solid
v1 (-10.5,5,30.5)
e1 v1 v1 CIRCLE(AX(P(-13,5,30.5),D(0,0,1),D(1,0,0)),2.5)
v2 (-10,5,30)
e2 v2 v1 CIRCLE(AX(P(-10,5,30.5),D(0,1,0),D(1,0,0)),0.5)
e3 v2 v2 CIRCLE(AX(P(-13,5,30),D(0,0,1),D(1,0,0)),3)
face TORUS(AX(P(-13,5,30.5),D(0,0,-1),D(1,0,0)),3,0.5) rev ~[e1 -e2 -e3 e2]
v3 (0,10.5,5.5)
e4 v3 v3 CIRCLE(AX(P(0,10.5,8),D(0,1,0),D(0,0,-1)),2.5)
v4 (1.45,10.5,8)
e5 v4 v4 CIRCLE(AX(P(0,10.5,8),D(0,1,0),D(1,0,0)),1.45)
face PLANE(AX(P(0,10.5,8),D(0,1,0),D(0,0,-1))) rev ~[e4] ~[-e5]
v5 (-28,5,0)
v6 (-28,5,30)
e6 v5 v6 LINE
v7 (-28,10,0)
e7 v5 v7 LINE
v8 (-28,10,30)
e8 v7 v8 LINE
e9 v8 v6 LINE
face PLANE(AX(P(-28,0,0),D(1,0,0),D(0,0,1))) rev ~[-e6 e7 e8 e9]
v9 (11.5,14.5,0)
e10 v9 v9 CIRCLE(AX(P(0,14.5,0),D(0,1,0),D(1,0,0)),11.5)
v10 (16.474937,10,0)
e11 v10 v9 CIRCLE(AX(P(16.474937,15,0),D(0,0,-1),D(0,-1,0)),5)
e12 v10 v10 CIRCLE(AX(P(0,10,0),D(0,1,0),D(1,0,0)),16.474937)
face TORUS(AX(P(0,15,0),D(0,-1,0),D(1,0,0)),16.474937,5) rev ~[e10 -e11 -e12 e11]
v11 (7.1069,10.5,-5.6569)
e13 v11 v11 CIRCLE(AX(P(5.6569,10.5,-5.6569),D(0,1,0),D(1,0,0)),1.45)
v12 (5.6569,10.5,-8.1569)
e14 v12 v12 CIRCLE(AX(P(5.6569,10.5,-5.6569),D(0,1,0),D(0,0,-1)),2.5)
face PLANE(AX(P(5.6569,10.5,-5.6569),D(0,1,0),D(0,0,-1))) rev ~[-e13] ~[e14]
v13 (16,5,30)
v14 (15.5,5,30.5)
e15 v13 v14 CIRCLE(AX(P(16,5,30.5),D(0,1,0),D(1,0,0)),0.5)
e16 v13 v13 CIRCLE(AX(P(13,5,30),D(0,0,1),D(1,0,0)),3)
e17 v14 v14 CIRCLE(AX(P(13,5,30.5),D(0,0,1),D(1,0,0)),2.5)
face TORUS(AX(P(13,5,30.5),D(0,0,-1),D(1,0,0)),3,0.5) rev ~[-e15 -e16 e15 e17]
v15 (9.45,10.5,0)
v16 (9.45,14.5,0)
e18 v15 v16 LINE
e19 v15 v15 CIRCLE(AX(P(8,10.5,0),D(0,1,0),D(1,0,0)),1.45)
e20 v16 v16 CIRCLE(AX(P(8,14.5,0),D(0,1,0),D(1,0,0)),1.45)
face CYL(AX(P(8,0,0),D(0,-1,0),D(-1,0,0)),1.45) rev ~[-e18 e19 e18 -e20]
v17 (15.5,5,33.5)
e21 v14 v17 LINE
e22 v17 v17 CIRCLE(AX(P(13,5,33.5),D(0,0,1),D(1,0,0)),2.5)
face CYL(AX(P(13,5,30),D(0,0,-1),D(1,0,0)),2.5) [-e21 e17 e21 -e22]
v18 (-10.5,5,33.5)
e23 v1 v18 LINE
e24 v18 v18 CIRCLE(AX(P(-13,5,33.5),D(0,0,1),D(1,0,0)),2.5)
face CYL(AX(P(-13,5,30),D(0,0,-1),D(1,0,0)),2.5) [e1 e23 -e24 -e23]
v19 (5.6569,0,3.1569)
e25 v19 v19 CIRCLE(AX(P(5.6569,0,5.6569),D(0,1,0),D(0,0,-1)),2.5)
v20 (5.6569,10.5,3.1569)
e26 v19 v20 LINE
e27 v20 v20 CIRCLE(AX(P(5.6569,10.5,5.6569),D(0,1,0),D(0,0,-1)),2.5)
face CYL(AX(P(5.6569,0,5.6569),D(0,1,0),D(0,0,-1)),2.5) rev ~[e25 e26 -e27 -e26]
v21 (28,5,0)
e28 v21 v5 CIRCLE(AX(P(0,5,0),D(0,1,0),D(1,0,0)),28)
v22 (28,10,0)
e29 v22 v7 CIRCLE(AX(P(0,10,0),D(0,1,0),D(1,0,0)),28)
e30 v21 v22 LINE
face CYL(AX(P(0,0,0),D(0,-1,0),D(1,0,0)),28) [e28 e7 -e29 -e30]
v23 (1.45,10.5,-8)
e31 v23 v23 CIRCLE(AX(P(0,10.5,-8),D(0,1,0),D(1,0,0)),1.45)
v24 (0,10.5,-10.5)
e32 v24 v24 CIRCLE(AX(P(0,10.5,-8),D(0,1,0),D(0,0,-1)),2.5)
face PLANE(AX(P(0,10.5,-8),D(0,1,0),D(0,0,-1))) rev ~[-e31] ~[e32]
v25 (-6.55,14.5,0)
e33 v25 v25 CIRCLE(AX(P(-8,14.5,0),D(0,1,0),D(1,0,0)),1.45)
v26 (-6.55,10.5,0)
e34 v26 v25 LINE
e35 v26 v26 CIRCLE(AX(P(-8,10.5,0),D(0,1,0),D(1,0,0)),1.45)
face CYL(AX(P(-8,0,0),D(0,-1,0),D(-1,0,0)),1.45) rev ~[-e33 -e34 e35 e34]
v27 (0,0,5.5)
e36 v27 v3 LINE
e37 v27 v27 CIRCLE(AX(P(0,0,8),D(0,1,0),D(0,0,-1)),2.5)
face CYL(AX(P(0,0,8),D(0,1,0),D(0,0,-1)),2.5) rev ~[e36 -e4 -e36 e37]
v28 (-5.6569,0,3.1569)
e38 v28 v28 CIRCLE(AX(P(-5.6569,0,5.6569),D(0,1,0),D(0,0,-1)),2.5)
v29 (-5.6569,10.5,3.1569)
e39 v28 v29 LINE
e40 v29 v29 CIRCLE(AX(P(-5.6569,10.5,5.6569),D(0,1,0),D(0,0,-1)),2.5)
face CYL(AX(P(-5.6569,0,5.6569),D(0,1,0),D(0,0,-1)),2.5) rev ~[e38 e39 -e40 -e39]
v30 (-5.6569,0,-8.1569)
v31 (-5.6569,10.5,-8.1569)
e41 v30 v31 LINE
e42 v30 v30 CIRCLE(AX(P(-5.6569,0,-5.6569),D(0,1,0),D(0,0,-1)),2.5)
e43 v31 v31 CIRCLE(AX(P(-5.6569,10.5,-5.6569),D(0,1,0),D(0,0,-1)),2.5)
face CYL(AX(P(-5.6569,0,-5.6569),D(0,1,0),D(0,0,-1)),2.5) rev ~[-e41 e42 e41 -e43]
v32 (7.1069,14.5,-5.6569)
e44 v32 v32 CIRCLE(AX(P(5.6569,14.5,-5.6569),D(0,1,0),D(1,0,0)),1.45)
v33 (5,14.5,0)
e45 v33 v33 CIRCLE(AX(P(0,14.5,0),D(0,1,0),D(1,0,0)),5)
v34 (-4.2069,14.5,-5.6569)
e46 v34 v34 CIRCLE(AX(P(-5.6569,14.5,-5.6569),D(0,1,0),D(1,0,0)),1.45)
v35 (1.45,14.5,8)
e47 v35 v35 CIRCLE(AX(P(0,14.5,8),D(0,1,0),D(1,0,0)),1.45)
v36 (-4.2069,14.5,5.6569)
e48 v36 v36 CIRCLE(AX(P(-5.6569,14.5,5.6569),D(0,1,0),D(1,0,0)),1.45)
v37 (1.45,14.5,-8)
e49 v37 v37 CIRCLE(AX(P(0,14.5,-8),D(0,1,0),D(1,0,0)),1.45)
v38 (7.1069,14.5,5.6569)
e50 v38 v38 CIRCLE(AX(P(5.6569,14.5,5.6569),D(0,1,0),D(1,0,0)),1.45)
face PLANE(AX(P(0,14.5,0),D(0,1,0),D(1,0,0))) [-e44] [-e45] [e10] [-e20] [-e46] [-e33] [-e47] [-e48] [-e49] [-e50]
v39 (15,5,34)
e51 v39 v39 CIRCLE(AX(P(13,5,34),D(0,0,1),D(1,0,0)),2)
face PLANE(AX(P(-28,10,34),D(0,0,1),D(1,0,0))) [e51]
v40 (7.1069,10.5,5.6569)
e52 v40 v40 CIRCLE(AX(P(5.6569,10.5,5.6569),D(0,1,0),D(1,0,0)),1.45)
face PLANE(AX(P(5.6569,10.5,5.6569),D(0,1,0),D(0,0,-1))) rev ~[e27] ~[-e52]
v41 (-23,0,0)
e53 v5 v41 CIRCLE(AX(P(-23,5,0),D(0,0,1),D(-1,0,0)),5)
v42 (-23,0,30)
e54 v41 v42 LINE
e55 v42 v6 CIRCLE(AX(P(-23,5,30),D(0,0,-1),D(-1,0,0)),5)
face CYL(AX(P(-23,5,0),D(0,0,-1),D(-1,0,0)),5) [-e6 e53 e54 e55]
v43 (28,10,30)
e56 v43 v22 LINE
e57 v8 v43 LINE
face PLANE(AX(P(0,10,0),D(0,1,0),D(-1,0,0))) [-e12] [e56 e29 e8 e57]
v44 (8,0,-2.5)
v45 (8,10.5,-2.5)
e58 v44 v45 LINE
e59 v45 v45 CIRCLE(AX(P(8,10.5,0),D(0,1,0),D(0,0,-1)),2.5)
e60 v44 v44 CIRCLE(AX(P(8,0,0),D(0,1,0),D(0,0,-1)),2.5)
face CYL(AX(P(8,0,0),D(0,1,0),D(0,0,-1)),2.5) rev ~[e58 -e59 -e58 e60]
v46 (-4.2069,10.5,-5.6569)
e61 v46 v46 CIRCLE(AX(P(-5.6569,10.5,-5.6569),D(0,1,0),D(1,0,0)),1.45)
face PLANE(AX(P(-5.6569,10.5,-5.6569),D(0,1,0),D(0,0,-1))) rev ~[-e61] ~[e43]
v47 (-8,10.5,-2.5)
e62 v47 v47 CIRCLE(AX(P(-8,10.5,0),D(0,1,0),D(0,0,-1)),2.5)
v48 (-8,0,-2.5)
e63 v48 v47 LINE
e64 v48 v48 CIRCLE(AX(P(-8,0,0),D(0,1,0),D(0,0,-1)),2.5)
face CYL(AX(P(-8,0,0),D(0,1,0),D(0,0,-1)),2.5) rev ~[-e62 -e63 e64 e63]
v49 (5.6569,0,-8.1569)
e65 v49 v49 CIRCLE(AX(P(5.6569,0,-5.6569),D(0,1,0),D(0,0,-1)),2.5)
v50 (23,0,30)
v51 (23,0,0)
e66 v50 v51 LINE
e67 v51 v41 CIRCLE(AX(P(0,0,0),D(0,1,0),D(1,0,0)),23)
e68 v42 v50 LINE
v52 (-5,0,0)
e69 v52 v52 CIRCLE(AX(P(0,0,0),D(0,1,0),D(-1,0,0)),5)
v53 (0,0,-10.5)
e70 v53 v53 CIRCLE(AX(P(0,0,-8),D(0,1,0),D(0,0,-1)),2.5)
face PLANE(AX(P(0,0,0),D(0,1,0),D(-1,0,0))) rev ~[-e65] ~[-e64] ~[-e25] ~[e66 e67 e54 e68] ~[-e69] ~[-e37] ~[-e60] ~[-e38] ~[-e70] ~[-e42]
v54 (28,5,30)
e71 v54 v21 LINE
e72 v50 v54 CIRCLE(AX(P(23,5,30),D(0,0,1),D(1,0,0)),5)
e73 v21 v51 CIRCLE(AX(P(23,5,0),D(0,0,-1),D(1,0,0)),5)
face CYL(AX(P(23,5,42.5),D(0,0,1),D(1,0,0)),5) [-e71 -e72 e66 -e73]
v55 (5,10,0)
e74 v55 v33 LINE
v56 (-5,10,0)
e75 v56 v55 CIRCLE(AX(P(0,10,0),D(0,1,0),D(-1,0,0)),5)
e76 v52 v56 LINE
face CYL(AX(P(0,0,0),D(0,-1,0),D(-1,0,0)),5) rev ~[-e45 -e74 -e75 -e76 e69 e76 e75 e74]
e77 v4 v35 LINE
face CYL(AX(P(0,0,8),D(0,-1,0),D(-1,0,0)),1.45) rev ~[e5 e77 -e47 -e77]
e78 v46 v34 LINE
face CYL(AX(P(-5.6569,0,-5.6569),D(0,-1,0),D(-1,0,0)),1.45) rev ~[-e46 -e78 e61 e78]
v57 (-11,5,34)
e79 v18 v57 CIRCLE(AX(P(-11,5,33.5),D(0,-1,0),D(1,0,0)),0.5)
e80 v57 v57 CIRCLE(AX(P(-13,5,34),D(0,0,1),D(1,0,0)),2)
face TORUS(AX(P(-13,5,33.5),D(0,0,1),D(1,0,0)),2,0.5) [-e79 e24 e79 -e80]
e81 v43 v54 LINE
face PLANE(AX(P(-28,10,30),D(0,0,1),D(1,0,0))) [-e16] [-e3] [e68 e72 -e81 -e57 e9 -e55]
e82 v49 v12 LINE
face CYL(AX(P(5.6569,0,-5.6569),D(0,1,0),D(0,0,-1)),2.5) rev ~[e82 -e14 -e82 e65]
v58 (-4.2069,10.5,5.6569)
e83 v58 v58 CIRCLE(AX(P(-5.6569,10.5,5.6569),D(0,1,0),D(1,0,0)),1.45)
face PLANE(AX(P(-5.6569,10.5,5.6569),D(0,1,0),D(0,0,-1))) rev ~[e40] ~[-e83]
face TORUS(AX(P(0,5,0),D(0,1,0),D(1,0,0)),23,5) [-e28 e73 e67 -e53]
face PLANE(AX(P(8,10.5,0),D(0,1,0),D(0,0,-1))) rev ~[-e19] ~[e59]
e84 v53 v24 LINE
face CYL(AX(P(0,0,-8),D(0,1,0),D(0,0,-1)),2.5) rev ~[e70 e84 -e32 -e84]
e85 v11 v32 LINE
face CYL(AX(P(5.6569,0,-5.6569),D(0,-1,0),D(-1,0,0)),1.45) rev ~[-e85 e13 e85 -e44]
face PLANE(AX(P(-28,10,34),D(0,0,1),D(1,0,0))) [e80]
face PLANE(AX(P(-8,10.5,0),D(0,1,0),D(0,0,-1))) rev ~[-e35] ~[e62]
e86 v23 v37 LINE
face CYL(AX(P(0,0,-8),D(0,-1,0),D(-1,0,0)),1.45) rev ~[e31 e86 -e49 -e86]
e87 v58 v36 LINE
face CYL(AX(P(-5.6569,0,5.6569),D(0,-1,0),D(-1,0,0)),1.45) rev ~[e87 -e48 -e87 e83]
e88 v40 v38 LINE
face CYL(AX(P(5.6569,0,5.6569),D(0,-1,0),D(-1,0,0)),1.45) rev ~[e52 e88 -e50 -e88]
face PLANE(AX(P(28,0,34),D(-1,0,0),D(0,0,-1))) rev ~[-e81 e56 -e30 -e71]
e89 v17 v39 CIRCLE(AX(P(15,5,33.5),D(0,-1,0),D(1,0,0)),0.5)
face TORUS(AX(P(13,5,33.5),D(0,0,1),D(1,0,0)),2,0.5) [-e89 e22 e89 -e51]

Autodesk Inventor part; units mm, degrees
ref_plane "YZ Plane" through (0, 0, 0) normal (1, 0, 0) x (0, 1, 0)
ref_plane "XZ Plane" through (0, 0, 0) normal (0, 1, 0) x (-1, 0, 0)
ref_plane "XY Plane" through (0, 0, 0) normal (0, 0, 1) x (1, 0, 0)
sketch "Sketch1" plane through (0, 0, 0) normal (0, 1, 0) x (-1, 0, 0)
  circle A0 centre (0, 0) radius 11.5 construction
  circle A1 centre (0, 0) radius 4 construction
  circle A2 centre (0, 0) radius 5
  circle A3 centre (0, 0) radius 8 construction
  circle A4 centre (8, 0) radius 1.45
  circle A5 centre (5.6569, 5.6569) radius 1.45
  circle A6 centre (0, 8) radius 1.45
  circle A7 centre (-5.6569, 5.6569) radius 1.45
  circle A8 centre (-8, 0) radius 1.45
  circle A9 centre (-5.6569, -5.6569) radius 1.45
  circle A10 centre (0, -8) radius 1.45
  circle A11 centre (5.6569, -5.6569) radius 1.45
  arc A12 (-28, 0) -> (28, 0) centre (0, 0) ccw
  line L0 (28, 0) -> (28, 34)
  line L1 (28, 0) -> (62, 0) construction
  line L2 (28, 34) -> (-28, 34)
  line L3 (-28, 34) -> (-28, 0)
  dimension "d4" = 16
  dimension "d2" = 1
  dimension "d3" = 10
  dimension "d5" = 2.9
  dimension "d6" = 360
  dimension "d7" = 28
  dimension "d8" = 34
  dimension "d9" = 90
extrude "Extrusion1" add sketch "Sketch1" along normal blind 10
sketch "Sketch2" plane through (0, 10, 0) normal (0, 1, 0) x (1, 0, 0)
  circle A0 centre (0, 0) radius 11.5 projected
  circle A1 centre (-5.6569, -5.6569) radius 1.45 projected
  circle A2 centre (-8, 0) radius 1.45 projected
  circle A3 centre (-5.6569, 5.6569) radius 1.45 projected
  circle A4 centre (0, 8) radius 1.45 projected
  circle A5 centre (5.6569, 5.6569) radius 1.45 projected
  circle A6 centre (0, 0) radius 5 projected
  circle A7 centre (8, 0) radius 1.45 projected
  circle A8 centre (5.6569, -5.6569) radius 1.45 projected
  circle A9 centre (5.6569, -5.6569) radius 1.45 projected
  circle A10 centre (0, -8) radius 1.45 projected
extrude "Extrusion2" add sketch "Sketch2" along normal blind 4.5
sketch "Sketch3" plane through (0, 0, 0) normal (0, -1, 0) x (1, 0, 0)
  circle A0 centre (8, 0) radius 1.45 construction
  circle A1 centre (5.6569, -5.6569) radius 1.45 construction
  circle A2 centre (0, -8) radius 1.45 construction
  circle A3 centre (-5.6569, -5.6569) radius 1.45 construction
  circle A4 centre (-8, 0) radius 1.45 construction
  circle A5 centre (0, 0) radius 5 construction
  circle A6 centre (-5.6569, -5.6569) radius 1.45 construction
  circle A7 centre (0, -8) radius 1.45 construction
  circle A8 centre (5.6569, -5.6569) radius 1.45 construction
  circle A9 centre (8, 0) radius 1.45 construction
  circle A10 centre (5.6569, 5.6569) radius 1.45 construction
  circle A11 centre (0, 8) radius 1.45 construction
  circle A12 centre (-5.6569, 5.6569) radius 1.45 construction
  circle A13 centre (-8, 0) radius 1.45 construction
  arc A14 (-28, 0) -> (28, 0) centre (0, 0) ccw construction
  line L0 (28, 34) -> (28, 0) construction
  line L1 (-28, 34) -> (28, 34) construction
  line L2 (-28, 0) -> (-28, 34) construction
hole "Hole1" at (5.6569, 0, 5.6569) at (8, 0, 0) at (5.6569, 0, -5.6569) at (0, 0, -8) at (-5.6569, 0, -5.6569) at (-8, 0, 0) at (-5.6569, 0, 5.6569) at (0, 0, 8) direction (0, 1, 0) diameter 5 depth 10.5
sketch "Sketch4" plane through (0, 10, 0) normal (0, 1, 0) x (1, 0, 0)
  line L0 (28, -34) -> (28, 0) projected
  line L1 (-28, 0) -> (-28, -34) projected
  line L2 (28, -34) -> (-28, -34)
  line L3 (-28, -34) -> (-28, -30)
  line L4 (-28, -30) -> (28, -30)
  line L5 (28, -30) -> (28, -34)
  point P0 (0, 0)
  dimension "d21" = 4
extrude "Extrusion6" cut sketch "Sketch4" against normal through all
sketch "Sketch9" plane through (-28, 10, 30) normal (0, 0, 1) x (1, 0, 0)
  line L0 (56, -62) -> (56, 0)
  line L1 (0, 0) -> (56, 0)
  line L2 (56, 0) -> (56, -10)
  line L3 (56, -10) -> (0, -10)
  line L4 (0, -10) -> (0, 0)
  line L5 (0, -62) -> (0, 0) construction
  line L6 (0, -5) -> (56, -5) construction
  circle A0 centre (15, -5) radius 2.5
  circle A1 centre (41, -5) radius 2.5
  point P0 (28, -10)
  point P1 (28, -72)
  dimension "d64" = 10
  dimension "d65" = 15
  dimension "d66" = 15
  dimension "d67" = 5
  dimension "d68" = 5
extrude "Extrusion7" add sketch "Sketch9" along normal blind 4 contours A0 | A1
fillet "Fillet4" radius 0.5 4 edges at (-15.5, 5, 30) (-15.5, 5, 34) (10.5, 5, 34) (10.5, 5, 30)
fillet "Fillet5" radius 5 4 edges at (-28, 0, 15) (28, 0, 15) (0, 0, -28) (-11.5, 10, 0)
properties part number "arm_segment_3_2b"
